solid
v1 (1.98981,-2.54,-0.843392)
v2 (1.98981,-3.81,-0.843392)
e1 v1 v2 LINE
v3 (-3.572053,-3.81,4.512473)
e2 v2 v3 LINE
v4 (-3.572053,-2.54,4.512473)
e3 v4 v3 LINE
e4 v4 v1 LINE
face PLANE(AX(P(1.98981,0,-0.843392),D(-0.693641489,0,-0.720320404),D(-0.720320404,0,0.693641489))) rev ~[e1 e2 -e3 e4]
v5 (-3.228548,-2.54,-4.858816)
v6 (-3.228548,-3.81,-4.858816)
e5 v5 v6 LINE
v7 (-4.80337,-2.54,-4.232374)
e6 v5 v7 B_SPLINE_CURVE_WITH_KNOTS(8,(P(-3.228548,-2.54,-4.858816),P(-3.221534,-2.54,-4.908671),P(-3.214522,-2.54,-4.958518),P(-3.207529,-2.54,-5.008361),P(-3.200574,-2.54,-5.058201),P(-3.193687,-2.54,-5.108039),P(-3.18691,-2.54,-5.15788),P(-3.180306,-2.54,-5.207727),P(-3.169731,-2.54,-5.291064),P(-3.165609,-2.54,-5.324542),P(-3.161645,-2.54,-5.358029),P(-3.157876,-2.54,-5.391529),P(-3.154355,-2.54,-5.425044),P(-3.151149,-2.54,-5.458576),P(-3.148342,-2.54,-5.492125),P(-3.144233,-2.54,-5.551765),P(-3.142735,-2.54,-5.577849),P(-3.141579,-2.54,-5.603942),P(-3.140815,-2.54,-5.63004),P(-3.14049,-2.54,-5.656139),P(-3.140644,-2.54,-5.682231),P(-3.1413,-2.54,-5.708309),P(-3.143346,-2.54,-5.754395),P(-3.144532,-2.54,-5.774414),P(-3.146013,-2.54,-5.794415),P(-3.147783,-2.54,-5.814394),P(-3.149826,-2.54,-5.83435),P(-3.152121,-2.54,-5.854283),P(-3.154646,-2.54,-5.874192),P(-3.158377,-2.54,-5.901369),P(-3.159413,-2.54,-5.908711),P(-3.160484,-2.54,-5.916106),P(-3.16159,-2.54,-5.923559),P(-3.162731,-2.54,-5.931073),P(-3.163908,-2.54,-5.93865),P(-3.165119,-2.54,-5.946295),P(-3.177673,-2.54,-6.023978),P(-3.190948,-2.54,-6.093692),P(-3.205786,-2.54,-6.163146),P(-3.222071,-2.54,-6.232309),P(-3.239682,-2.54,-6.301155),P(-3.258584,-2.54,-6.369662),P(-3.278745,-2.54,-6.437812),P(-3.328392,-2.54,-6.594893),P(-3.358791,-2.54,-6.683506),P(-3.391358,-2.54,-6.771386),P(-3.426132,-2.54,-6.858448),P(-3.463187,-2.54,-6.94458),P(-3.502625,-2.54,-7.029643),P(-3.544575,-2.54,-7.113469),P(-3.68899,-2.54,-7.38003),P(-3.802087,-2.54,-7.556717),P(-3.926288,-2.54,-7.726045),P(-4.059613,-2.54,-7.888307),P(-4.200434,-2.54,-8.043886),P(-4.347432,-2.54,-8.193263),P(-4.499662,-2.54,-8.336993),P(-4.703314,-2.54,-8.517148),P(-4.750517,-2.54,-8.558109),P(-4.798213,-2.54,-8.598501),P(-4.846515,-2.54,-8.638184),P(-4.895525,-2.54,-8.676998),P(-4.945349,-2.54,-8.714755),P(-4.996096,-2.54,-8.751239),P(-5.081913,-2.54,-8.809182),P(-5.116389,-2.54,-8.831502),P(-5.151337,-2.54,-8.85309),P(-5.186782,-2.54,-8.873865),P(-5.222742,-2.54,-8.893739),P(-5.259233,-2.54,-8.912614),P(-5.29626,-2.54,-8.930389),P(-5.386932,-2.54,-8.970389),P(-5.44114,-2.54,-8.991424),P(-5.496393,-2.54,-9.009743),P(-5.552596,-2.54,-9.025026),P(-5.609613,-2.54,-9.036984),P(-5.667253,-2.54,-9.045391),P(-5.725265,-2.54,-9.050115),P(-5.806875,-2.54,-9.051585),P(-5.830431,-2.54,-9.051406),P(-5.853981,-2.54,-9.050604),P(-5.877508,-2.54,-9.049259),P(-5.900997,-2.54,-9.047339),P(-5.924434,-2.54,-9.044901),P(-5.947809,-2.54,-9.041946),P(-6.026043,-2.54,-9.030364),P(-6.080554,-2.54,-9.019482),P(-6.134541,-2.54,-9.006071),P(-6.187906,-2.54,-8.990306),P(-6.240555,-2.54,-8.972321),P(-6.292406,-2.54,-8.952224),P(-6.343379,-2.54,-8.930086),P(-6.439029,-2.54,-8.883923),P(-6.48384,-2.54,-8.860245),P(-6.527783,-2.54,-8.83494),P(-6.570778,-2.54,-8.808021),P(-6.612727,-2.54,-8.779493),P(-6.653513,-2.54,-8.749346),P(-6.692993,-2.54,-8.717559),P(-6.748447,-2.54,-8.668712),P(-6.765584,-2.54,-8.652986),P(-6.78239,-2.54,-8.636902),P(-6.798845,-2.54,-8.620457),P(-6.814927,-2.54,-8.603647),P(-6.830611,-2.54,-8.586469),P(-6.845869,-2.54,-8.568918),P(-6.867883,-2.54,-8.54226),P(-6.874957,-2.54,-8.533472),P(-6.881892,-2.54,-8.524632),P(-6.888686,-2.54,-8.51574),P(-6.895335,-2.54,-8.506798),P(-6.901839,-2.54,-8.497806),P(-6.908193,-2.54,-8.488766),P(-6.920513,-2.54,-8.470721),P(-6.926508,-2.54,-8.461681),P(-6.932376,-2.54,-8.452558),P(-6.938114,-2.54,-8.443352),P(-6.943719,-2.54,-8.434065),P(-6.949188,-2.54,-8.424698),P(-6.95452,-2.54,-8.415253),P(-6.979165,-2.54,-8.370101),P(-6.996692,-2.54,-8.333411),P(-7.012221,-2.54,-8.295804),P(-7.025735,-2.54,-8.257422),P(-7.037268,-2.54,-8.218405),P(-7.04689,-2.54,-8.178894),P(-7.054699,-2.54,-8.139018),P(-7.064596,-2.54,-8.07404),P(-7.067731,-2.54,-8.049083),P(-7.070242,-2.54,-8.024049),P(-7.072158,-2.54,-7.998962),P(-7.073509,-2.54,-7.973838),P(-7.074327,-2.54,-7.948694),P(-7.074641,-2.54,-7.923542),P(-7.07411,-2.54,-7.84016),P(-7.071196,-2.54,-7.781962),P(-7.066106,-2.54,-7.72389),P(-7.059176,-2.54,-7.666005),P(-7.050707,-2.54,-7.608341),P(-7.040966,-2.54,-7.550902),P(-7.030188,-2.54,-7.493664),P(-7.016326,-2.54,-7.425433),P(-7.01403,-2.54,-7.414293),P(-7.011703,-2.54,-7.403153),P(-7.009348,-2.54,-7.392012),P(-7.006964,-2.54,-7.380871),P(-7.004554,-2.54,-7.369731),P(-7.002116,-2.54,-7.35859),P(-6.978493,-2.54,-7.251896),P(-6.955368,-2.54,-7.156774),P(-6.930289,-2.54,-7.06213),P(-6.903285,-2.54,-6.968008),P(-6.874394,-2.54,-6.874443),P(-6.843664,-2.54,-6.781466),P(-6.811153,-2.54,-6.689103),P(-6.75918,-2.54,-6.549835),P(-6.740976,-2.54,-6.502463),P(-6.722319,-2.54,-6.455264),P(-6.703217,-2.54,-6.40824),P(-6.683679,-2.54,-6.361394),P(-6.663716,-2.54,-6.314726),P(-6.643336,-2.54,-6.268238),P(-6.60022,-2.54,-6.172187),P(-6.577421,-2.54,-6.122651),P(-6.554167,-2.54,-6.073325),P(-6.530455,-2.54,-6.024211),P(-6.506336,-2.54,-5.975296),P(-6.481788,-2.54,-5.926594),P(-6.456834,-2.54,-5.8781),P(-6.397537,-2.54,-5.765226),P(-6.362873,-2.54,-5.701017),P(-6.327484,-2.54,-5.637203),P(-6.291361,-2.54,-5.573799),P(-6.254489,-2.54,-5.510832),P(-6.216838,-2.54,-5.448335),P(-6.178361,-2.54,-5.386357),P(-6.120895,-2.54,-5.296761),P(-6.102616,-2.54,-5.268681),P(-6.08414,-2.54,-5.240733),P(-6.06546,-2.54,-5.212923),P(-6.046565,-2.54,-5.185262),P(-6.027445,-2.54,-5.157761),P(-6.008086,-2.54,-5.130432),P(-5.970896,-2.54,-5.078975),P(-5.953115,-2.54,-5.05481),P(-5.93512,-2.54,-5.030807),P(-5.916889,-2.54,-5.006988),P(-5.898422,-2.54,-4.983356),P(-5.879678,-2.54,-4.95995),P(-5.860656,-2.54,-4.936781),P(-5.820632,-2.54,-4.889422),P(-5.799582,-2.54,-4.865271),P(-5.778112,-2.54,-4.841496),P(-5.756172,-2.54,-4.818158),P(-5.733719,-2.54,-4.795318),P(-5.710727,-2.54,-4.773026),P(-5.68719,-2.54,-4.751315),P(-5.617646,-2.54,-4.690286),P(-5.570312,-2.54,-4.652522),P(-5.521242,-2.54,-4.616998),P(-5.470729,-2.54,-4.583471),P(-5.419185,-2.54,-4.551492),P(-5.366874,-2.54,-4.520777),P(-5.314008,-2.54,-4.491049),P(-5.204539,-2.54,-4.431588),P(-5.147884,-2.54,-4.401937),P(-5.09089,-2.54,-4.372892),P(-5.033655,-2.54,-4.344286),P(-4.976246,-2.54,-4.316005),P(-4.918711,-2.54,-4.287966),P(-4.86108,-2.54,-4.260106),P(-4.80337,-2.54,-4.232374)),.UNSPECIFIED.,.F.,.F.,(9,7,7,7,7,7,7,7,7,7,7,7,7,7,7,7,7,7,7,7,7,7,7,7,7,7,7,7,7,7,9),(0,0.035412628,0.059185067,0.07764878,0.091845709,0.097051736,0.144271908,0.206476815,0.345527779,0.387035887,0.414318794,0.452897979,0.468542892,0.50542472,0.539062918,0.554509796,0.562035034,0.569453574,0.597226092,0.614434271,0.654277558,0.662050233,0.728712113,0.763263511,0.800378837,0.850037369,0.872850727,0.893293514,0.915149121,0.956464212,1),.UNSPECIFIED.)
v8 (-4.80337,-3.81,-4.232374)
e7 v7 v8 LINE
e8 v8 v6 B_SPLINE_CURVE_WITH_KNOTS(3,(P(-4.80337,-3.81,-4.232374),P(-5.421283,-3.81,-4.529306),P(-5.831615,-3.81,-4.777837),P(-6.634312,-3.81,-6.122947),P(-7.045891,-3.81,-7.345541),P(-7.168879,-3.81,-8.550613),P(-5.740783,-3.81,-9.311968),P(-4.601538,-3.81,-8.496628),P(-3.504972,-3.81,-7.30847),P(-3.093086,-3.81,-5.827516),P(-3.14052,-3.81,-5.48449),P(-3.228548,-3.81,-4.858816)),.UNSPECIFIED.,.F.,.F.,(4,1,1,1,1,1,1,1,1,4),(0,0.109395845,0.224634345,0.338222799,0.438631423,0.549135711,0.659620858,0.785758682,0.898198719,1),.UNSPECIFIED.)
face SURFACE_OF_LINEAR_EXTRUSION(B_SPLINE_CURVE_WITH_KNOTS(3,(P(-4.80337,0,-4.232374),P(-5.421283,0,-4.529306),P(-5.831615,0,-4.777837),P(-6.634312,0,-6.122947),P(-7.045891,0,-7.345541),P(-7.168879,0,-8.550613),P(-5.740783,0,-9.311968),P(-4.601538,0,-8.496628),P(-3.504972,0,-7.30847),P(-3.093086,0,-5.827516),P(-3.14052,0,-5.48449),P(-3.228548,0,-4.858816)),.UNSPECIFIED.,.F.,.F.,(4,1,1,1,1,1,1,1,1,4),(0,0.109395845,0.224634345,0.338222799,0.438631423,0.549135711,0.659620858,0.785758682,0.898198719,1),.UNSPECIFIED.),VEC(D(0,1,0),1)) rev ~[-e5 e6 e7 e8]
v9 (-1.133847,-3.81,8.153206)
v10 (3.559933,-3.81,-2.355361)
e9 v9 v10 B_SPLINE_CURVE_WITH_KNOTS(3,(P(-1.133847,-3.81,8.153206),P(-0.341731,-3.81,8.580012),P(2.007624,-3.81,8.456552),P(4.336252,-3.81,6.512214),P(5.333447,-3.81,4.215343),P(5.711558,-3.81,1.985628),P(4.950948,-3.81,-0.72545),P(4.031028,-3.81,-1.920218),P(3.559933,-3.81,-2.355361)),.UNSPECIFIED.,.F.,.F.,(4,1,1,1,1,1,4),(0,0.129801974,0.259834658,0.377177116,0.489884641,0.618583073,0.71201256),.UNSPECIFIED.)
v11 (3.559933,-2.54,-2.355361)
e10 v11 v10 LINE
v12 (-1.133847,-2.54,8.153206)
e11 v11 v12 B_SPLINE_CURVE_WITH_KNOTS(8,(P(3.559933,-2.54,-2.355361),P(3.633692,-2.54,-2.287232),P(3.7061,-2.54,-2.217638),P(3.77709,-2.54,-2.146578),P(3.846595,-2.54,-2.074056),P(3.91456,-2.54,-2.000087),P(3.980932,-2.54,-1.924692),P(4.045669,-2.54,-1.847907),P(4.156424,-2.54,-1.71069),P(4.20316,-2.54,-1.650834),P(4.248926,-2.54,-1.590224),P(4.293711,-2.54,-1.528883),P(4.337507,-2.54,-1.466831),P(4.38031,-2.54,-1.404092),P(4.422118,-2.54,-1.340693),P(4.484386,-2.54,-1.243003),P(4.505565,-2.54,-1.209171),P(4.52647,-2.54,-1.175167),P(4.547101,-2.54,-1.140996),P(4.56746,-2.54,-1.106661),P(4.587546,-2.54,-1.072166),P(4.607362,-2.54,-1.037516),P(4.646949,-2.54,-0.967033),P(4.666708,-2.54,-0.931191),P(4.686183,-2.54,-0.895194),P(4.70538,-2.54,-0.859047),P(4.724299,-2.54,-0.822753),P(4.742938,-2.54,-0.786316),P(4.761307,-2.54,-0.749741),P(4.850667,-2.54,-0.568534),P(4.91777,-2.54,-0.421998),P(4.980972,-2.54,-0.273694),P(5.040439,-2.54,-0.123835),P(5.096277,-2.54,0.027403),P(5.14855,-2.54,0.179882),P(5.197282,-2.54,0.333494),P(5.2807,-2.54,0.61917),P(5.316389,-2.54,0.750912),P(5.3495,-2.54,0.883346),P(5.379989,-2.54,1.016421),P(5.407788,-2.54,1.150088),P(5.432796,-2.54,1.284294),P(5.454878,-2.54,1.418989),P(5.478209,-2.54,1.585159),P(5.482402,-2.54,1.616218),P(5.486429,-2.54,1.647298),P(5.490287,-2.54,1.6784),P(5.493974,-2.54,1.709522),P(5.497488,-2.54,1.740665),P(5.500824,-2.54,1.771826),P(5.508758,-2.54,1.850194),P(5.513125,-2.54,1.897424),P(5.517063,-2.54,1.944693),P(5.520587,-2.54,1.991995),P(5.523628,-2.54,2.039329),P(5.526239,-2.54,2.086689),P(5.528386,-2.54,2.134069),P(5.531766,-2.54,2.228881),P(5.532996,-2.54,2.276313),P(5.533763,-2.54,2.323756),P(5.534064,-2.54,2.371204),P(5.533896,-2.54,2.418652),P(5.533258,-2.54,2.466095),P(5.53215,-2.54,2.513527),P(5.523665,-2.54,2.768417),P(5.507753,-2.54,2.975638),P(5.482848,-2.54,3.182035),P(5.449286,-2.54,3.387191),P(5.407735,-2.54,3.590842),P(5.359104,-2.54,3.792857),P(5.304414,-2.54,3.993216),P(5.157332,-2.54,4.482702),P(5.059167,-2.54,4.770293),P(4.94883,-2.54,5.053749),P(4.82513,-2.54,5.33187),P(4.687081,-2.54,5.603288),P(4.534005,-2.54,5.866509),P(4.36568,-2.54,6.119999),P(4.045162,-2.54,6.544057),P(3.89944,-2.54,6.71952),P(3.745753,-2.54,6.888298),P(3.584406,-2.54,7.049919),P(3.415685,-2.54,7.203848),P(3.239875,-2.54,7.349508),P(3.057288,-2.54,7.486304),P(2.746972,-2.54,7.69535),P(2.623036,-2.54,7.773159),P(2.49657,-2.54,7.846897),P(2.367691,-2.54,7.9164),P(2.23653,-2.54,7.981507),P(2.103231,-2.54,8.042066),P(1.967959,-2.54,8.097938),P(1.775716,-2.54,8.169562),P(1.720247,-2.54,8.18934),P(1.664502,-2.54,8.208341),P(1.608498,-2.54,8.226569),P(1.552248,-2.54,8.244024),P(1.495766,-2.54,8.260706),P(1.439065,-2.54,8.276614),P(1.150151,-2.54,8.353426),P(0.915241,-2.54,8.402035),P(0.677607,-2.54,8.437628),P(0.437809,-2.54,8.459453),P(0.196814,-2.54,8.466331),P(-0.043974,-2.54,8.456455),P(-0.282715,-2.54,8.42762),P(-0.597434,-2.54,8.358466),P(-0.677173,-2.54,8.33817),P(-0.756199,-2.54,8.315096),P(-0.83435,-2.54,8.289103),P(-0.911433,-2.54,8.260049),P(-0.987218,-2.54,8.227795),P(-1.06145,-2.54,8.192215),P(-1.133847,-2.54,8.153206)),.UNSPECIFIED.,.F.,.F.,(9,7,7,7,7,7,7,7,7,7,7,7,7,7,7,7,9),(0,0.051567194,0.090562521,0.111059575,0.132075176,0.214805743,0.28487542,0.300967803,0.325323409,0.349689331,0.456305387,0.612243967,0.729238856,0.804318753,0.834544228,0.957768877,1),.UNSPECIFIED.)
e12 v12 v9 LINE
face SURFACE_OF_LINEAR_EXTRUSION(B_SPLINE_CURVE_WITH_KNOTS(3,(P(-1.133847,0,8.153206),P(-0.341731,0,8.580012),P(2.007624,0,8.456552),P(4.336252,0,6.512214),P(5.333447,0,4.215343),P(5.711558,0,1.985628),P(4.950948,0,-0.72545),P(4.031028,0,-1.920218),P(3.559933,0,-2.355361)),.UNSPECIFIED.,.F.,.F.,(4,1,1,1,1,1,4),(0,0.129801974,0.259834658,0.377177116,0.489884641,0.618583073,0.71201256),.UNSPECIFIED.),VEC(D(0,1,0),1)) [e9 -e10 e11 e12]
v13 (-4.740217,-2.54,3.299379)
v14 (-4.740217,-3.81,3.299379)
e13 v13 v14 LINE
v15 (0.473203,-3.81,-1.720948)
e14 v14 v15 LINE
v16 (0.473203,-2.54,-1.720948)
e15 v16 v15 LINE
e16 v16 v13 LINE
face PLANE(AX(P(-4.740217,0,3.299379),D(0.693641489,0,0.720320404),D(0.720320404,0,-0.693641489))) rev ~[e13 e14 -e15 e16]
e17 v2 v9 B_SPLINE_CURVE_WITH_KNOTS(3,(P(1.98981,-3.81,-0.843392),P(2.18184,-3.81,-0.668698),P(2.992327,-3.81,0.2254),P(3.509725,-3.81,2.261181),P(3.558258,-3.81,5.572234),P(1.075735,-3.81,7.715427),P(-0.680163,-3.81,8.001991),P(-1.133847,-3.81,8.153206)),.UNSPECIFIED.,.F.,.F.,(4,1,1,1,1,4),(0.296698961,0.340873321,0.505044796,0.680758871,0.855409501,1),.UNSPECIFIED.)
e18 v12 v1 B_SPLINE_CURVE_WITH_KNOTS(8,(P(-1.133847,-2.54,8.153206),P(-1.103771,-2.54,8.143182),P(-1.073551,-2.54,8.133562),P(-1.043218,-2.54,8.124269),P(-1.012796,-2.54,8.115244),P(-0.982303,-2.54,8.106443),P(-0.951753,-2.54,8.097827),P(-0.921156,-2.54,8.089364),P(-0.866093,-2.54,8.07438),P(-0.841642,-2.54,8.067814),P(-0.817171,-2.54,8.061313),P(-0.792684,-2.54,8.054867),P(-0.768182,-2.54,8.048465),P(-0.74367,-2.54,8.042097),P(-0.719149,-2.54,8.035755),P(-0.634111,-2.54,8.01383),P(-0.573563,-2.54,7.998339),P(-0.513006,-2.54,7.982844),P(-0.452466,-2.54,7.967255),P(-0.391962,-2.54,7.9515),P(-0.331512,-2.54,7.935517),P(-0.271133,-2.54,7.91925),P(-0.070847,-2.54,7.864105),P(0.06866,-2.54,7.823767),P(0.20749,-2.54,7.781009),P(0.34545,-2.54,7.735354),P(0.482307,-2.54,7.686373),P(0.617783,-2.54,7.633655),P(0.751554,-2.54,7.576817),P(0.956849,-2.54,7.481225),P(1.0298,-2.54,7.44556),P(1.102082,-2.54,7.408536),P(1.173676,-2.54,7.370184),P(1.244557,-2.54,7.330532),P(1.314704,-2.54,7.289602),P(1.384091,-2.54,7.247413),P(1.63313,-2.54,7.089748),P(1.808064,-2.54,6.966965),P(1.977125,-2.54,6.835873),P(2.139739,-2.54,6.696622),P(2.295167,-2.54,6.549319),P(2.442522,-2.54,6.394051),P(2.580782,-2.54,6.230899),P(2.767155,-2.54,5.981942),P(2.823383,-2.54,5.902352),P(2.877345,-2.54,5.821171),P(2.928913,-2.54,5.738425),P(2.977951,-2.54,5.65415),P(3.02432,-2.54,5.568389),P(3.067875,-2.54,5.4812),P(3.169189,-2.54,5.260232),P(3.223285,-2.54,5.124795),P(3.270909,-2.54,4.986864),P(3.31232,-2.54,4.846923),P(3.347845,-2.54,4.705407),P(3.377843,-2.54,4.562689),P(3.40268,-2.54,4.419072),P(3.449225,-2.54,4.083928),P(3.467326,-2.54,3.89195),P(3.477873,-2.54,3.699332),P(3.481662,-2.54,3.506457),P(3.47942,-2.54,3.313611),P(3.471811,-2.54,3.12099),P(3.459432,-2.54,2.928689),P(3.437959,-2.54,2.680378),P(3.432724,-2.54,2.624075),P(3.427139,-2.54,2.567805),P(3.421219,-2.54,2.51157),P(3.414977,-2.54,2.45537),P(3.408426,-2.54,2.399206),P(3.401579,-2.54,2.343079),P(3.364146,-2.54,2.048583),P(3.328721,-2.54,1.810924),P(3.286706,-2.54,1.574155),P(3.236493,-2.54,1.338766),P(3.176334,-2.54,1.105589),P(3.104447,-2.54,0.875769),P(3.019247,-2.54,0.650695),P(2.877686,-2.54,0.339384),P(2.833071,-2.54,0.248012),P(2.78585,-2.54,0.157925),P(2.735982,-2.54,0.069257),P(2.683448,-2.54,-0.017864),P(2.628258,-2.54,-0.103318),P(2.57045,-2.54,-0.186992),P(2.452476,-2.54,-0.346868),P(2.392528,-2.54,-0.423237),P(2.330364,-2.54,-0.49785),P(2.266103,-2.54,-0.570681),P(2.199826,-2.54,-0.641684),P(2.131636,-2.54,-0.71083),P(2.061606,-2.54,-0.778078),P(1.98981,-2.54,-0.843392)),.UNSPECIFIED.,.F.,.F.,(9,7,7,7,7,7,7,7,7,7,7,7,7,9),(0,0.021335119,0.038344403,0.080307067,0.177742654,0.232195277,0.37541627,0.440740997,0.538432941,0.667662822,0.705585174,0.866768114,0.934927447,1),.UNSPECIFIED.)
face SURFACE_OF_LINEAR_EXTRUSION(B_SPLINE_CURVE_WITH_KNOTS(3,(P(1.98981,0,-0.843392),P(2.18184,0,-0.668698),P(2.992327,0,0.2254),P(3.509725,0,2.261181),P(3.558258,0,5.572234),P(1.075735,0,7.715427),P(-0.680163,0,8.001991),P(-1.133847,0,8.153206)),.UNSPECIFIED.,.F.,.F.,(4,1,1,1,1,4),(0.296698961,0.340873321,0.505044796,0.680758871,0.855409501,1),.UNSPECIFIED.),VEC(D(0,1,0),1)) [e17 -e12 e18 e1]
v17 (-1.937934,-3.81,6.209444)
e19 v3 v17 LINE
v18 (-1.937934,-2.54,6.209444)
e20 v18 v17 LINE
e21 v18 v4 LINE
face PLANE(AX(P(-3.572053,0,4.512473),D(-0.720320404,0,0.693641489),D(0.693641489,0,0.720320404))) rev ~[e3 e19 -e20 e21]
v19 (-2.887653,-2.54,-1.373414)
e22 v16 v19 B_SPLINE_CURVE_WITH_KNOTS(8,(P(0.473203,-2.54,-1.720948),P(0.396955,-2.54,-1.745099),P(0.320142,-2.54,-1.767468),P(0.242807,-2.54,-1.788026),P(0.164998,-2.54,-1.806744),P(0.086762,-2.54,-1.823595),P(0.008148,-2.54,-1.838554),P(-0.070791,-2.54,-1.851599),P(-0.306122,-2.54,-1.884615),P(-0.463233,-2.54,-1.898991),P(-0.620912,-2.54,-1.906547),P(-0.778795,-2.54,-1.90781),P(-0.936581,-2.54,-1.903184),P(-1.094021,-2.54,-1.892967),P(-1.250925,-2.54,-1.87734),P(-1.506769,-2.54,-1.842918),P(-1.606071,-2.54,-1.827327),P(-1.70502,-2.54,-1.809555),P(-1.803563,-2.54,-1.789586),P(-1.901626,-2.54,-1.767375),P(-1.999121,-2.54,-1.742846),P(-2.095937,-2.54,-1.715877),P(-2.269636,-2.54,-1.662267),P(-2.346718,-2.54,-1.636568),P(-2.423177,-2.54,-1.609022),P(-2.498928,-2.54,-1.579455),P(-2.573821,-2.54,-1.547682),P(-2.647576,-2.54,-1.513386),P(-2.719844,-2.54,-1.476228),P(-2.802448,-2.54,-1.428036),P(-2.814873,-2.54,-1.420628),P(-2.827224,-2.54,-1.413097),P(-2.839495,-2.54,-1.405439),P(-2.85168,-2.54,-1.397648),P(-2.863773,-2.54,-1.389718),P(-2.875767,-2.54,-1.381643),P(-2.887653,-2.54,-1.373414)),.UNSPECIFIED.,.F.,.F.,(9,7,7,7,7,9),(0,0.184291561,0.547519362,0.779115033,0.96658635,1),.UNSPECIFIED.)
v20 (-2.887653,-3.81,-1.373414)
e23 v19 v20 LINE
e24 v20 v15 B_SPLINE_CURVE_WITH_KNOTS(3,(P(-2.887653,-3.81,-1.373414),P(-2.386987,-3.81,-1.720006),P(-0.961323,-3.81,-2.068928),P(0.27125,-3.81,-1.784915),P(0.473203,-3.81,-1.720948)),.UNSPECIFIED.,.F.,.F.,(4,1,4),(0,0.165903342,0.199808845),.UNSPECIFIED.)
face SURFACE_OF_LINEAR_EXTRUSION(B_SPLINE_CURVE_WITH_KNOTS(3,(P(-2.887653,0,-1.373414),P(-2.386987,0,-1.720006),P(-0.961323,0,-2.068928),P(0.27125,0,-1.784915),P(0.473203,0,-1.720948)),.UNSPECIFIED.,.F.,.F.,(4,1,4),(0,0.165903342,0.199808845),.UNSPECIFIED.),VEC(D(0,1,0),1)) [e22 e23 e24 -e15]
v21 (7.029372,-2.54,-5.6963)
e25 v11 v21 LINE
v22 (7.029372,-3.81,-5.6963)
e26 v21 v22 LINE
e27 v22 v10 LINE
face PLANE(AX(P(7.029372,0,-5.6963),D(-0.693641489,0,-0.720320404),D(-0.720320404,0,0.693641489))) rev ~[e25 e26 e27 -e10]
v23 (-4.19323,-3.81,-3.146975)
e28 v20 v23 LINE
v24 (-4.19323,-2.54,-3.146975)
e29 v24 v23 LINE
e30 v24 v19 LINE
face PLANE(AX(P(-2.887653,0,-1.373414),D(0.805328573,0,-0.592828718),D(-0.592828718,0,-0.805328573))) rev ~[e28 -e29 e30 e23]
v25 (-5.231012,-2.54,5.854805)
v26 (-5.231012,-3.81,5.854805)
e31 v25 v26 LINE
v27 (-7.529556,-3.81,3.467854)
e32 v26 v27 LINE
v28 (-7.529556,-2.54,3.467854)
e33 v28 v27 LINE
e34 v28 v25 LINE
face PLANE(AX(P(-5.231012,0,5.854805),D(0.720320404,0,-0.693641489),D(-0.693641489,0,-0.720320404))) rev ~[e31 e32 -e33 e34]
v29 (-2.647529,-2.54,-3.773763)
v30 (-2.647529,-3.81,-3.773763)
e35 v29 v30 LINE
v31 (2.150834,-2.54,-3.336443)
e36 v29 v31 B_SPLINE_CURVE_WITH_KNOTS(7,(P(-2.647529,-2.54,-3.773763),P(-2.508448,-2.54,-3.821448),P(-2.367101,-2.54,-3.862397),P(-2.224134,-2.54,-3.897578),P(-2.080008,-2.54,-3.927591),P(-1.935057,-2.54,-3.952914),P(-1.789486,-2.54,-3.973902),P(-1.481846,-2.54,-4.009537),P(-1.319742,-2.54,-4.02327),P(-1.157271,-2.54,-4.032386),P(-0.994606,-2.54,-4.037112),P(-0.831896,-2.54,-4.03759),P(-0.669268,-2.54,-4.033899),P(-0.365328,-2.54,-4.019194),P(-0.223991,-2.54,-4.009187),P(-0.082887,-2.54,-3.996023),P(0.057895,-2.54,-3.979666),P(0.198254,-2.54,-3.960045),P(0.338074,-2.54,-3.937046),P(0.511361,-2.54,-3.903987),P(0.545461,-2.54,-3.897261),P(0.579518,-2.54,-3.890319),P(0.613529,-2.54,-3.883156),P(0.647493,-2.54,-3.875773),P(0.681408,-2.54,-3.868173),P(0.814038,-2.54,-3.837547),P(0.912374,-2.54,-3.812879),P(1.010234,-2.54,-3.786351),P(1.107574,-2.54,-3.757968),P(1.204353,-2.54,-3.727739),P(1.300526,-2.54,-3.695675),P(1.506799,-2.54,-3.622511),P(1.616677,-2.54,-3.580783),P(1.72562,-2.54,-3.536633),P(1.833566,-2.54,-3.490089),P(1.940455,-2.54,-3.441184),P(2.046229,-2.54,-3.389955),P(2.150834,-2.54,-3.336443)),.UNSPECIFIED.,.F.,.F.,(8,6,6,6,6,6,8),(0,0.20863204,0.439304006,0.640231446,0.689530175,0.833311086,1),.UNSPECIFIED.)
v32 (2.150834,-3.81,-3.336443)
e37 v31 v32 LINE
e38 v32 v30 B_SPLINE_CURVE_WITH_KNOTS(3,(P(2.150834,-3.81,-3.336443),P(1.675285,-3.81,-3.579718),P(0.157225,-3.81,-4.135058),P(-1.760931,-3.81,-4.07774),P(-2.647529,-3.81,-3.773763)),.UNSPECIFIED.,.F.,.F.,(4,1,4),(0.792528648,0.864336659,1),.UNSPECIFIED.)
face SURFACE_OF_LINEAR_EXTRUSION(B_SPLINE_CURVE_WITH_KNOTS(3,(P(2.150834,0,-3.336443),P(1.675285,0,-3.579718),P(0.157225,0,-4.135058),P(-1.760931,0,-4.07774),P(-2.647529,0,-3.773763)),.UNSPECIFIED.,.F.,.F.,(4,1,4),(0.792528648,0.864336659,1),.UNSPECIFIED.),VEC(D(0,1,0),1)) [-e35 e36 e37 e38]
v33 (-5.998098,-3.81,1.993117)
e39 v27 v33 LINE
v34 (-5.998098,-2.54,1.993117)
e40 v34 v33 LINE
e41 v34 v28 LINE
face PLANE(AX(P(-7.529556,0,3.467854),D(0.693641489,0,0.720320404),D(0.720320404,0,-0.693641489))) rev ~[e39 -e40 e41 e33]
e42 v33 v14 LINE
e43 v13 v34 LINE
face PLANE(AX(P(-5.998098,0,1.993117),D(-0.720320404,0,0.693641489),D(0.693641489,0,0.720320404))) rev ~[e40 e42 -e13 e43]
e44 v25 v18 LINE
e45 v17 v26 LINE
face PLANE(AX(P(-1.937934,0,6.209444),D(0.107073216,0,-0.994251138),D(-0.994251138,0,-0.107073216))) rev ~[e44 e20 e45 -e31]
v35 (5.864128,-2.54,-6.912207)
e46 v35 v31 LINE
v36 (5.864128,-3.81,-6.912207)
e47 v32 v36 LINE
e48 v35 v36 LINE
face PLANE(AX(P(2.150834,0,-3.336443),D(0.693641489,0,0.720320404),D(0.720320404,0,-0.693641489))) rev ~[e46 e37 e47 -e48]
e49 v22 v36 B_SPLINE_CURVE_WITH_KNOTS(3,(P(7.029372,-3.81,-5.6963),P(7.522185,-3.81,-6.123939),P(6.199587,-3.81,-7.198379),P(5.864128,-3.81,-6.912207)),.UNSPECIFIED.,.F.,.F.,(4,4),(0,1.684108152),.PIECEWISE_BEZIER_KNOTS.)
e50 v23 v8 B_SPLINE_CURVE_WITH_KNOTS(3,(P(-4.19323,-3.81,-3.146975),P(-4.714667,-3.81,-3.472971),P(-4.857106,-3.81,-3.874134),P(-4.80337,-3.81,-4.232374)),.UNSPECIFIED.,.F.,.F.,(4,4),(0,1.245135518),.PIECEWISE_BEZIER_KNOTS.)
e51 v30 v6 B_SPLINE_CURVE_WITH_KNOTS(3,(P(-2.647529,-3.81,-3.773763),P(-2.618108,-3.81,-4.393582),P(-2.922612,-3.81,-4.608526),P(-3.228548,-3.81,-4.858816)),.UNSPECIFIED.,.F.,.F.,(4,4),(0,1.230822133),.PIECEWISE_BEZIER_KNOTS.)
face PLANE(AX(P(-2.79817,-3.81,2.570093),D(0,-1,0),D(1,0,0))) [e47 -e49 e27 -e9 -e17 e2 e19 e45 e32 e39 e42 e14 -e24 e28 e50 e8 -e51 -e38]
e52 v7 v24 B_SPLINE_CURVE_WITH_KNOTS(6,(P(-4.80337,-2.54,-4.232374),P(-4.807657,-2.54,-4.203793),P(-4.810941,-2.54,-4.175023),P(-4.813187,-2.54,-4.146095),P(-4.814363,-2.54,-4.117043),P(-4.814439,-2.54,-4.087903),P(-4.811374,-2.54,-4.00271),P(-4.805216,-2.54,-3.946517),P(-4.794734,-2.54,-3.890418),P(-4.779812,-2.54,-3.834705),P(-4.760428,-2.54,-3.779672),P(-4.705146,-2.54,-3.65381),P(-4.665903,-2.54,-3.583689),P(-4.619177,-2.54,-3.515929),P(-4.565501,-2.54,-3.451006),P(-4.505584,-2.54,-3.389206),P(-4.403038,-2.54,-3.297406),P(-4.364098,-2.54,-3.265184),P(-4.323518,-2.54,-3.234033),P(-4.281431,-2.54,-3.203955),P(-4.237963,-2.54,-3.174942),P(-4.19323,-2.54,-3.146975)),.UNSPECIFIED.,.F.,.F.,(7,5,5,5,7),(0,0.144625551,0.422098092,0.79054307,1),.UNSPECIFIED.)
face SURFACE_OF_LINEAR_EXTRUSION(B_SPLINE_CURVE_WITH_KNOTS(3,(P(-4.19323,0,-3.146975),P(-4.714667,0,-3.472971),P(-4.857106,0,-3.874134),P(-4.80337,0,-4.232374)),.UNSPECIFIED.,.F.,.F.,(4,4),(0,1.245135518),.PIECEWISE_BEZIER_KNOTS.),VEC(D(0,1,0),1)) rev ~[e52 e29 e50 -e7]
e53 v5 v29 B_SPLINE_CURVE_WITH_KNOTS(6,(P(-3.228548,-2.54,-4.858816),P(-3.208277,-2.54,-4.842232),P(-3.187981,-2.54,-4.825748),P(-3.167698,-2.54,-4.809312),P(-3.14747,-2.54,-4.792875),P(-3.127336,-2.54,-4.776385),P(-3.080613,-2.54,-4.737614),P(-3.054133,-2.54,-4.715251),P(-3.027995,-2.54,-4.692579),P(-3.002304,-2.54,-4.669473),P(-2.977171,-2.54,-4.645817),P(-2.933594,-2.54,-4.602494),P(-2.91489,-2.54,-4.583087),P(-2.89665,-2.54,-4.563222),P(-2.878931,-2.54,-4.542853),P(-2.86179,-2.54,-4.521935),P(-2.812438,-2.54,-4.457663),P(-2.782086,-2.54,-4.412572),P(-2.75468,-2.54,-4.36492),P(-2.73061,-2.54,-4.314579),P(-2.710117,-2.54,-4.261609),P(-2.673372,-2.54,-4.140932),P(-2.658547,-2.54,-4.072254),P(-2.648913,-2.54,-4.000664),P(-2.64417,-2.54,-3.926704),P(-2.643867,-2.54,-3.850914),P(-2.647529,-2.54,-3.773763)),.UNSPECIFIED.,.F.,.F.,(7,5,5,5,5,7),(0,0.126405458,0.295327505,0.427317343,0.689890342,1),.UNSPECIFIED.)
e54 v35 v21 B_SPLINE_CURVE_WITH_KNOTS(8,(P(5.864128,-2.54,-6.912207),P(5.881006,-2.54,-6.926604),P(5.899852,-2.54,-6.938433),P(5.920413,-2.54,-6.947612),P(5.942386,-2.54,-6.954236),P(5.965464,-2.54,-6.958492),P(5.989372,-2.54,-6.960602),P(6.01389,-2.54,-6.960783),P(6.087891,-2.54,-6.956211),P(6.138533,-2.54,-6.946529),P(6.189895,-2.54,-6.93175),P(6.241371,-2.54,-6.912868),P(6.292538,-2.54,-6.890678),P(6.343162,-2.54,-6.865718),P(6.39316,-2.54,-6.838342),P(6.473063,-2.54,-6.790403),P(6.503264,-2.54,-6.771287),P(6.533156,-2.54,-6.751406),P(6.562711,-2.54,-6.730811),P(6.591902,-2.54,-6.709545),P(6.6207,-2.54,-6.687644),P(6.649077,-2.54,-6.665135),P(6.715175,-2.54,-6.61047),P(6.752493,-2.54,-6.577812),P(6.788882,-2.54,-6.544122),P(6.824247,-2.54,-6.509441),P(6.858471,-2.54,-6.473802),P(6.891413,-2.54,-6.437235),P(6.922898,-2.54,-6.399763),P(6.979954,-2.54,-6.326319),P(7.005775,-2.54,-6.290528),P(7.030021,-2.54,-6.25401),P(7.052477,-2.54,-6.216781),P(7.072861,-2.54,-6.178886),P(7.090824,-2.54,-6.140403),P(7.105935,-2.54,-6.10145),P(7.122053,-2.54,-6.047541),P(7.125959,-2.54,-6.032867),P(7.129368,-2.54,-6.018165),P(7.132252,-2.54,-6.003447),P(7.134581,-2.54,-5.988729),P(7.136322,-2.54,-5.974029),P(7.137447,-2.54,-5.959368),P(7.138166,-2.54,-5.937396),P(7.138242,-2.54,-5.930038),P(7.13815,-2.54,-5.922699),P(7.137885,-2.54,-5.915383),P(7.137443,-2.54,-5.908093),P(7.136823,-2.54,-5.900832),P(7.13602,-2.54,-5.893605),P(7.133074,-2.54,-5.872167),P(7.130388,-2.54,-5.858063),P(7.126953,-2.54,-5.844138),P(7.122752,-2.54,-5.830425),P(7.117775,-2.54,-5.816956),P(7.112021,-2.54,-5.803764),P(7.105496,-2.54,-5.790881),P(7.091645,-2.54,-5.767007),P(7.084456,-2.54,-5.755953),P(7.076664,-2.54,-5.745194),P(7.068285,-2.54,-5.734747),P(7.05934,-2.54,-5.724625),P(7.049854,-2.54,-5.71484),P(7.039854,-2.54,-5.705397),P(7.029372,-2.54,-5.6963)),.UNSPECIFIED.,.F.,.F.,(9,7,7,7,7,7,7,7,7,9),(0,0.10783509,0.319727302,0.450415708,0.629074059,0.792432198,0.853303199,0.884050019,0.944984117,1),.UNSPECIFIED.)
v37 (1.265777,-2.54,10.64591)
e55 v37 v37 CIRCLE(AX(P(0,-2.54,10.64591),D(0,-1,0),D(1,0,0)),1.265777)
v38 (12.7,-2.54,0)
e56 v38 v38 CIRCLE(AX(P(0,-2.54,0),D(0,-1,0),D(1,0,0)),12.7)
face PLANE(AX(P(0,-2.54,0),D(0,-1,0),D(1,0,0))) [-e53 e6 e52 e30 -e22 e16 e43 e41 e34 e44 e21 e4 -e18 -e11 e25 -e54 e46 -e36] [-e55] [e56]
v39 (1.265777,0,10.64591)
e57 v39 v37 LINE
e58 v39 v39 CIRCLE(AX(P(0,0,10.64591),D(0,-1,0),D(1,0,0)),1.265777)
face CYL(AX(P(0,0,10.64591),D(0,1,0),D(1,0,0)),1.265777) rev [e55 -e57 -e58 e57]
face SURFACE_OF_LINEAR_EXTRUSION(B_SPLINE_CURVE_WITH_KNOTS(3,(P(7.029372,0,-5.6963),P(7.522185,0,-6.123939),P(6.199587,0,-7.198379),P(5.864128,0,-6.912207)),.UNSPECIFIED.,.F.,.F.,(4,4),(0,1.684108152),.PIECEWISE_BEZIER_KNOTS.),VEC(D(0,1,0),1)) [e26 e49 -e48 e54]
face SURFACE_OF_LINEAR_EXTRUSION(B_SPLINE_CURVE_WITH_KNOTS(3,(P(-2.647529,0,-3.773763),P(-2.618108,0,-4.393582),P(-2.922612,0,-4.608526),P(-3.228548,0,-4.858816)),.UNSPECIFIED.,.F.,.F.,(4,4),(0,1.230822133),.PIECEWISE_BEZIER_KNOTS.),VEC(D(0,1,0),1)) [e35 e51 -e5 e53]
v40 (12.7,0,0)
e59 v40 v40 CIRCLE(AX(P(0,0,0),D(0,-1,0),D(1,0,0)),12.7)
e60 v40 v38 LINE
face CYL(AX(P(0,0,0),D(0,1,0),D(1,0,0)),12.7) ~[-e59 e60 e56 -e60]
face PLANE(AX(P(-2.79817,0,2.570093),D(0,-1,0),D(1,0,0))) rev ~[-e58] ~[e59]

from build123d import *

# Parameters (mm, degrees)
F0_R     = 12.7
F0_R_2   = 1.2657765137
F1_DEPTH = 2.54
F2_DEPTH = 3.81


with BuildPart() as f1:
    # F0 (on Front) → F1 (new body)
    with BuildSketch(Plane.XZ):
        Circle(F0_R)
        with BuildLine():
            Line((-5.9980981207, 1.9931174991), (-7.5295561864, 3.4678540847))
            Line((-7.5295561864, 3.4678540847), (-5.2310121246, 5.8548050001))
            Line((-5.2310121246, 5.8548050001), (-1.9379338482, 6.2094442546))
            Line((-1.9379338482, 6.2094442546), (-3.5720530129, 4.5124734196))
            Line((-3.5720530129, 4.5124734196), (1.9898101435, -0.8433918597))
            add(Edge.make_bspline(
                [(1.9898101435, -0.8433918597), (2.181839817, -0.6686980904), (2.9923268789, 0.2254004935), (3.5097247457, 2.2611806235), (3.5582576463, 5.5722342669), (1.0757347307, 7.7154267447), (-0.6801631143, 8.0019912543), (-1.1338472479, 8.1532060726)],
                knots=[0.2966989611, 0.2966989611, 0.2966989611, 0.2966989611, 0.3408733214, 0.5050447961, 0.6807588711, 0.8554095009, 1, 1, 1, 1], degree=3))
            add(Edge.make_bspline(
                [(-1.1338472479, 8.1532060726), (-0.3417312748, 8.5800115317), (2.0076237784, 8.4565524057), (4.3362523203, 6.5122135204), (5.3334470637, 4.2153426842), (5.7115580421, 1.9856279561), (4.9509483833, -0.7254500645), (4.0310276615, -1.9202184076), (3.5599331607, -2.3553613411)],
                knots=[0, 0, 0, 0, 0.1298019735, 0.2598346579, 0.3771771158, 0.4898846412, 0.6185830731, 0.71201256, 0.71201256, 0.71201256, 0.71201256], degree=3))
            Line((3.5599331607, -2.3553613411), (7.0293718017, -5.6963004173))
            add(Edge.make_bspline(
                [(7.0293718017, -5.6963004173), (7.5221849988, -6.1239386803), (6.1995871365, -7.1983786766), (5.8641284704, -6.9122067653)],
                knots=[0, 0, 0, 0, 1.6841081521, 1.6841081521, 1.6841081521, 1.6841081521], degree=3))
            Line((5.8641284704, -6.9122067653), (2.1508335508, -3.3364432536))
            add(Edge.make_bspline(
                [(2.1508335508, -3.3364432536), (1.6752853418, -3.5797182972), (0.1572248048, -4.1350575123), (-1.7609307542, -4.0777400136), (-2.6475286577, -3.7737630773)],
                knots=[0.7925286484, 0.7925286484, 0.7925286484, 0.7925286484, 0.8643366586, 1, 1, 1, 1], degree=3))
            add(Edge.make_bspline(
                [(-2.6475286577, -3.7737630773), (-2.6181081776, -4.3935817666), (-2.9226117767, -4.6085258946), (-3.22854775, -4.8588160425)],
                knots=[0, 0, 0, 0, 1.230822133, 1.230822133, 1.230822133, 1.230822133], degree=3))
            add(Edge.make_bspline(
                [(-4.8033702187, -4.2323740199), (-5.4212825728, -4.5293064688), (-5.8316147769, -4.7778373261), (-6.6343124935, -6.1229466147), (-7.0458907635, -7.3455408415), (-7.16887863, -8.5506128462), (-5.7407828877, -9.3119682828), (-4.6015383692, -8.4966283885), (-3.5049723158, -7.3084696393), (-3.0930861156, -5.8275163642), (-3.1405196662, -5.4844899198), (-3.22854775, -4.8588160425)],
                knots=[0, 0, 0, 0, 0.1093958452, 0.2246343447, 0.3382227988, 0.4386314231, 0.5491357113, 0.6596208576, 0.7857586816, 0.8981987194, 1, 1, 1, 1], degree=3))
            add(Edge.make_bspline(
                [(-4.1932296008, -3.1469750684), (-4.7146673314, -3.4729705658), (-4.8571061343, -3.8741342723), (-4.8033702187, -4.2323740199)],
                knots=[0, 0, 0, 0, 1.2451355178, 1.2451355178, 1.2451355178, 1.2451355178], degree=3))
            Line((-4.1932296008, -3.1469750684), (-2.8876534512, -1.373414264))
            add(Edge.make_bspline(
                [(-2.8876534512, -1.373414264), (-2.386986779, -1.7200056059), (-0.9613233884, -2.068928273), (0.2712498796, -1.7849151458), (0.4732034023, -1.7209484435)],
                knots=[0, 0, 0, 0, 0.1659033418, 0.1998088447, 0.1998088447, 0.1998088447, 0.1998088447], degree=3))
            Line((0.4732034023, -1.7209484435), (-4.740216914, 3.2993794706))
            Line((-4.740216914, 3.2993794706), (-5.9980981207, 1.9931174991))
        make_face(mode=Mode.SUBTRACT)
        with Locations((0, 10.6459101662)):
            Circle(F0_R_2, mode=Mode.SUBTRACT)
        with BuildLine():
            add(Edge.make_bspline(
                [(0.4732034023, -1.7209484435), (1.0503162203, -1.5381538908), (1.5686206286, -1.2265575579), (1.9898101435, -0.8433918597)],
                knots=[0.1998088447, 0.1998088447, 0.1998088447, 0.1998088447, 0.2966989611, 0.2966989611, 0.2966989611, 0.2966989611], degree=3))
            add(Edge.make_bspline(
                [(-2.8876534512, -1.373414264), (-2.386986779, -1.7200056059), (-0.9613233884, -2.068928273), (0.2712498796, -1.7849151458), (0.4732034023, -1.7209484435)],
                knots=[0, 0, 0, 0, 0.1659033418, 0.1998088447, 0.1998088447, 0.1998088447, 0.1998088447], degree=3))
            Line((-2.8876534512, -1.373414264), (-4.1932296008, -3.1469750684))
            add(Edge.make_bspline(
                [(-4.1932296008, -3.1469750684), (-4.7146673314, -3.4729705658), (-4.8571061343, -3.8741342723), (-4.8033702187, -4.2323740199)],
                knots=[0, 0, 0, 0, 1.2451355178, 1.2451355178, 1.2451355178, 1.2451355178], degree=3))
            add(Edge.make_bspline(
                [(-4.8033702187, -4.2323740199), (-5.4212825728, -4.5293064688), (-5.8316147769, -4.7778373261), (-6.6343124935, -6.1229466147), (-7.0458907635, -7.3455408415), (-7.16887863, -8.5506128462), (-5.7407828877, -9.3119682828), (-4.6015383692, -8.4966283885), (-3.5049723158, -7.3084696393), (-3.0930861156, -5.8275163642), (-3.1405196662, -5.4844899198), (-3.22854775, -4.8588160425)],
                knots=[0, 0, 0, 0, 0.1093958452, 0.2246343447, 0.3382227988, 0.4386314231, 0.5491357113, 0.6596208576, 0.7857586816, 0.8981987194, 1, 1, 1, 1], degree=3))
            add(Edge.make_bspline(
                [(-2.6475286577, -3.7737630773), (-2.6181081776, -4.3935817666), (-2.9226117767, -4.6085258946), (-3.22854775, -4.8588160425)],
                knots=[0, 0, 0, 0, 1.230822133, 1.230822133, 1.230822133, 1.230822133], degree=3))
            add(Edge.make_bspline(
                [(2.1508335508, -3.3364432536), (1.6752853418, -3.5797182972), (0.1572248048, -4.1350575123), (-1.7609307542, -4.0777400136), (-2.6475286577, -3.7737630773)],
                knots=[0.7925286484, 0.7925286484, 0.7925286484, 0.7925286484, 0.8643366586, 1, 1, 1, 1], degree=3))
            add(Edge.make_bspline(
                [(3.5599331607, -2.3553613411), (3.4359379602, -2.4698938503), (3.0108649417, -2.8296074096), (2.5211954544, -3.1469781131), (2.1508335508, -3.3364432536)],
                knots=[0.71201256, 0.71201256, 0.71201256, 0.71201256, 0.7366038212, 0.7925286484, 0.7925286484, 0.7925286484, 0.7925286484], degree=3))
            add(Edge.make_bspline(
                [(-1.1338472479, 8.1532060726), (-0.3417312748, 8.5800115317), (2.0076237784, 8.4565524057), (4.3362523203, 6.5122135204), (5.3334470637, 4.2153426842), (5.7115580421, 1.9856279561), (4.9509483833, -0.7254500645), (4.0310276615, -1.9202184076), (3.5599331607, -2.3553613411)],
                knots=[0, 0, 0, 0, 0.1298019735, 0.2598346579, 0.3771771158, 0.4898846412, 0.6185830731, 0.71201256, 0.71201256, 0.71201256, 0.71201256], degree=3))
            add(Edge.make_bspline(
                [(1.9898101435, -0.8433918597), (2.181839817, -0.6686980904), (2.9923268789, 0.2254004935), (3.5097247457, 2.2611806235), (3.5582576463, 5.5722342669), (1.0757347307, 7.7154267447), (-0.6801631143, 8.0019912543), (-1.1338472479, 8.1532060726)],
                knots=[0.2966989611, 0.2966989611, 0.2966989611, 0.2966989611, 0.3408733214, 0.5050447961, 0.6807588711, 0.8554095009, 1, 1, 1, 1], degree=3))
        make_face()
        with BuildLine():
            Line((7.0293718017, -5.6963004173), (3.5599331607, -2.3553613411))
            add(Edge.make_bspline(
                [(3.5599331607, -2.3553613411), (3.4359379602, -2.4698938503), (3.0108649417, -2.8296074096), (2.5211954544, -3.1469781131), (2.1508335508, -3.3364432536)],
                knots=[0.71201256, 0.71201256, 0.71201256, 0.71201256, 0.7366038212, 0.7925286484, 0.7925286484, 0.7925286484, 0.7925286484], degree=3))
            Line((2.1508335508, -3.3364432536), (5.8641284704, -6.9122067653))
            add(Edge.make_bspline(
                [(7.0293718017, -5.6963004173), (7.5221849988, -6.1239386803), (6.1995871365, -7.1983786766), (5.8641284704, -6.9122067653)],
                knots=[0, 0, 0, 0, 1.6841081521, 1.6841081521, 1.6841081521, 1.6841081521], degree=3))
        make_face()
    extrude(amount=F1_DEPTH)

    # F0 (on Front) → F2 (join)
    with BuildSketch(Plane.XZ):
        with BuildLine():
            Line((-5.2310121246, 5.8548050001), (-7.5295561864, 3.4678540847))
            Line((-7.5295561864, 3.4678540847), (-5.9980981207, 1.9931174991))
            Line((-5.9980981207, 1.9931174991), (-4.740216914, 3.2993794706))
            Line((-4.740216914, 3.2993794706), (0.4732034023, -1.7209484435))
            add(Edge.make_bspline(
                [(0.4732034023, -1.7209484435), (1.0503162203, -1.5381538908), (1.5686206286, -1.2265575579), (1.9898101435, -0.8433918597)],
                knots=[0.1998088447, 0.1998088447, 0.1998088447, 0.1998088447, 0.2966989611, 0.2966989611, 0.2966989611, 0.2966989611], degree=3))
            Line((1.9898101435, -0.8433918597), (-3.5720530129, 4.5124734196))
            Line((-3.5720530129, 4.5124734196), (-1.9379338482, 6.2094442546))
            Line((-1.9379338482, 6.2094442546), (-5.2310121246, 5.8548050001))
        make_face()
        with BuildLine():
            add(Edge.make_bspline(
                [(0.4732034023, -1.7209484435), (1.0503162203, -1.5381538908), (1.5686206286, -1.2265575579), (1.9898101435, -0.8433918597)],
                knots=[0.1998088447, 0.1998088447, 0.1998088447, 0.1998088447, 0.2966989611, 0.2966989611, 0.2966989611, 0.2966989611], degree=3))
            add(Edge.make_bspline(
                [(-2.8876534512, -1.373414264), (-2.386986779, -1.7200056059), (-0.9613233884, -2.068928273), (0.2712498796, -1.7849151458), (0.4732034023, -1.7209484435)],
                knots=[0, 0, 0, 0, 0.1659033418, 0.1998088447, 0.1998088447, 0.1998088447, 0.1998088447], degree=3))
            Line((-2.8876534512, -1.373414264), (-4.1932296008, -3.1469750684))
            add(Edge.make_bspline(
                [(-4.1932296008, -3.1469750684), (-4.7146673314, -3.4729705658), (-4.8571061343, -3.8741342723), (-4.8033702187, -4.2323740199)],
                knots=[0, 0, 0, 0, 1.2451355178, 1.2451355178, 1.2451355178, 1.2451355178], degree=3))
            add(Edge.make_bspline(
                [(-4.8033702187, -4.2323740199), (-5.4212825728, -4.5293064688), (-5.8316147769, -4.7778373261), (-6.6343124935, -6.1229466147), (-7.0458907635, -7.3455408415), (-7.16887863, -8.5506128462), (-5.7407828877, -9.3119682828), (-4.6015383692, -8.4966283885), (-3.5049723158, -7.3084696393), (-3.0930861156, -5.8275163642), (-3.1405196662, -5.4844899198), (-3.22854775, -4.8588160425)],
                knots=[0, 0, 0, 0, 0.1093958452, 0.2246343447, 0.3382227988, 0.4386314231, 0.5491357113, 0.6596208576, 0.7857586816, 0.8981987194, 1, 1, 1, 1], degree=3))
            add(Edge.make_bspline(
                [(-2.6475286577, -3.7737630773), (-2.6181081776, -4.3935817666), (-2.9226117767, -4.6085258946), (-3.22854775, -4.8588160425)],
                knots=[0, 0, 0, 0, 1.230822133, 1.230822133, 1.230822133, 1.230822133], degree=3))
            add(Edge.make_bspline(
                [(2.1508335508, -3.3364432536), (1.6752853418, -3.5797182972), (0.1572248048, -4.1350575123), (-1.7609307542, -4.0777400136), (-2.6475286577, -3.7737630773)],
                knots=[0.7925286484, 0.7925286484, 0.7925286484, 0.7925286484, 0.8643366586, 1, 1, 1, 1], degree=3))
            add(Edge.make_bspline(
                [(3.5599331607, -2.3553613411), (3.4359379602, -2.4698938503), (3.0108649417, -2.8296074096), (2.5211954544, -3.1469781131), (2.1508335508, -3.3364432536)],
                knots=[0.71201256, 0.71201256, 0.71201256, 0.71201256, 0.7366038212, 0.7925286484, 0.7925286484, 0.7925286484, 0.7925286484], degree=3))
            add(Edge.make_bspline(
                [(-1.1338472479, 8.1532060726), (-0.3417312748, 8.5800115317), (2.0076237784, 8.4565524057), (4.3362523203, 6.5122135204), (5.3334470637, 4.2153426842), (5.7115580421, 1.9856279561), (4.9509483833, -0.7254500645), (4.0310276615, -1.9202184076), (3.5599331607, -2.3553613411)],
                knots=[0, 0, 0, 0, 0.1298019735, 0.2598346579, 0.3771771158, 0.4898846412, 0.6185830731, 0.71201256, 0.71201256, 0.71201256, 0.71201256], degree=3))
            add(Edge.make_bspline(
                [(1.9898101435, -0.8433918597), (2.181839817, -0.6686980904), (2.9923268789, 0.2254004935), (3.5097247457, 2.2611806235), (3.5582576463, 5.5722342669), (1.0757347307, 7.7154267447), (-0.6801631143, 8.0019912543), (-1.1338472479, 8.1532060726)],
                knots=[0.2966989611, 0.2966989611, 0.2966989611, 0.2966989611, 0.3408733214, 0.5050447961, 0.6807588711, 0.8554095009, 1, 1, 1, 1], degree=3))
        make_face()
        with BuildLine():
            Line((7.0293718017, -5.6963004173), (3.5599331607, -2.3553613411))
            add(Edge.make_bspline(
                [(3.5599331607, -2.3553613411), (3.4359379602, -2.4698938503), (3.0108649417, -2.8296074096), (2.5211954544, -3.1469781131), (2.1508335508, -3.3364432536)],
                knots=[0.71201256, 0.71201256, 0.71201256, 0.71201256, 0.7366038212, 0.7925286484, 0.7925286484, 0.7925286484, 0.7925286484], degree=3))
            Line((2.1508335508, -3.3364432536), (5.8641284704, -6.9122067653))
            add(Edge.make_bspline(
                [(7.0293718017, -5.6963004173), (7.5221849988, -6.1239386803), (6.1995871365, -7.1983786766), (5.8641284704, -6.9122067653)],
                knots=[0, 0, 0, 0, 1.6841081521, 1.6841081521, 1.6841081521, 1.6841081521], degree=3))
        make_face()
    extrude(amount=F2_DEPTH)


solid = f1.part
